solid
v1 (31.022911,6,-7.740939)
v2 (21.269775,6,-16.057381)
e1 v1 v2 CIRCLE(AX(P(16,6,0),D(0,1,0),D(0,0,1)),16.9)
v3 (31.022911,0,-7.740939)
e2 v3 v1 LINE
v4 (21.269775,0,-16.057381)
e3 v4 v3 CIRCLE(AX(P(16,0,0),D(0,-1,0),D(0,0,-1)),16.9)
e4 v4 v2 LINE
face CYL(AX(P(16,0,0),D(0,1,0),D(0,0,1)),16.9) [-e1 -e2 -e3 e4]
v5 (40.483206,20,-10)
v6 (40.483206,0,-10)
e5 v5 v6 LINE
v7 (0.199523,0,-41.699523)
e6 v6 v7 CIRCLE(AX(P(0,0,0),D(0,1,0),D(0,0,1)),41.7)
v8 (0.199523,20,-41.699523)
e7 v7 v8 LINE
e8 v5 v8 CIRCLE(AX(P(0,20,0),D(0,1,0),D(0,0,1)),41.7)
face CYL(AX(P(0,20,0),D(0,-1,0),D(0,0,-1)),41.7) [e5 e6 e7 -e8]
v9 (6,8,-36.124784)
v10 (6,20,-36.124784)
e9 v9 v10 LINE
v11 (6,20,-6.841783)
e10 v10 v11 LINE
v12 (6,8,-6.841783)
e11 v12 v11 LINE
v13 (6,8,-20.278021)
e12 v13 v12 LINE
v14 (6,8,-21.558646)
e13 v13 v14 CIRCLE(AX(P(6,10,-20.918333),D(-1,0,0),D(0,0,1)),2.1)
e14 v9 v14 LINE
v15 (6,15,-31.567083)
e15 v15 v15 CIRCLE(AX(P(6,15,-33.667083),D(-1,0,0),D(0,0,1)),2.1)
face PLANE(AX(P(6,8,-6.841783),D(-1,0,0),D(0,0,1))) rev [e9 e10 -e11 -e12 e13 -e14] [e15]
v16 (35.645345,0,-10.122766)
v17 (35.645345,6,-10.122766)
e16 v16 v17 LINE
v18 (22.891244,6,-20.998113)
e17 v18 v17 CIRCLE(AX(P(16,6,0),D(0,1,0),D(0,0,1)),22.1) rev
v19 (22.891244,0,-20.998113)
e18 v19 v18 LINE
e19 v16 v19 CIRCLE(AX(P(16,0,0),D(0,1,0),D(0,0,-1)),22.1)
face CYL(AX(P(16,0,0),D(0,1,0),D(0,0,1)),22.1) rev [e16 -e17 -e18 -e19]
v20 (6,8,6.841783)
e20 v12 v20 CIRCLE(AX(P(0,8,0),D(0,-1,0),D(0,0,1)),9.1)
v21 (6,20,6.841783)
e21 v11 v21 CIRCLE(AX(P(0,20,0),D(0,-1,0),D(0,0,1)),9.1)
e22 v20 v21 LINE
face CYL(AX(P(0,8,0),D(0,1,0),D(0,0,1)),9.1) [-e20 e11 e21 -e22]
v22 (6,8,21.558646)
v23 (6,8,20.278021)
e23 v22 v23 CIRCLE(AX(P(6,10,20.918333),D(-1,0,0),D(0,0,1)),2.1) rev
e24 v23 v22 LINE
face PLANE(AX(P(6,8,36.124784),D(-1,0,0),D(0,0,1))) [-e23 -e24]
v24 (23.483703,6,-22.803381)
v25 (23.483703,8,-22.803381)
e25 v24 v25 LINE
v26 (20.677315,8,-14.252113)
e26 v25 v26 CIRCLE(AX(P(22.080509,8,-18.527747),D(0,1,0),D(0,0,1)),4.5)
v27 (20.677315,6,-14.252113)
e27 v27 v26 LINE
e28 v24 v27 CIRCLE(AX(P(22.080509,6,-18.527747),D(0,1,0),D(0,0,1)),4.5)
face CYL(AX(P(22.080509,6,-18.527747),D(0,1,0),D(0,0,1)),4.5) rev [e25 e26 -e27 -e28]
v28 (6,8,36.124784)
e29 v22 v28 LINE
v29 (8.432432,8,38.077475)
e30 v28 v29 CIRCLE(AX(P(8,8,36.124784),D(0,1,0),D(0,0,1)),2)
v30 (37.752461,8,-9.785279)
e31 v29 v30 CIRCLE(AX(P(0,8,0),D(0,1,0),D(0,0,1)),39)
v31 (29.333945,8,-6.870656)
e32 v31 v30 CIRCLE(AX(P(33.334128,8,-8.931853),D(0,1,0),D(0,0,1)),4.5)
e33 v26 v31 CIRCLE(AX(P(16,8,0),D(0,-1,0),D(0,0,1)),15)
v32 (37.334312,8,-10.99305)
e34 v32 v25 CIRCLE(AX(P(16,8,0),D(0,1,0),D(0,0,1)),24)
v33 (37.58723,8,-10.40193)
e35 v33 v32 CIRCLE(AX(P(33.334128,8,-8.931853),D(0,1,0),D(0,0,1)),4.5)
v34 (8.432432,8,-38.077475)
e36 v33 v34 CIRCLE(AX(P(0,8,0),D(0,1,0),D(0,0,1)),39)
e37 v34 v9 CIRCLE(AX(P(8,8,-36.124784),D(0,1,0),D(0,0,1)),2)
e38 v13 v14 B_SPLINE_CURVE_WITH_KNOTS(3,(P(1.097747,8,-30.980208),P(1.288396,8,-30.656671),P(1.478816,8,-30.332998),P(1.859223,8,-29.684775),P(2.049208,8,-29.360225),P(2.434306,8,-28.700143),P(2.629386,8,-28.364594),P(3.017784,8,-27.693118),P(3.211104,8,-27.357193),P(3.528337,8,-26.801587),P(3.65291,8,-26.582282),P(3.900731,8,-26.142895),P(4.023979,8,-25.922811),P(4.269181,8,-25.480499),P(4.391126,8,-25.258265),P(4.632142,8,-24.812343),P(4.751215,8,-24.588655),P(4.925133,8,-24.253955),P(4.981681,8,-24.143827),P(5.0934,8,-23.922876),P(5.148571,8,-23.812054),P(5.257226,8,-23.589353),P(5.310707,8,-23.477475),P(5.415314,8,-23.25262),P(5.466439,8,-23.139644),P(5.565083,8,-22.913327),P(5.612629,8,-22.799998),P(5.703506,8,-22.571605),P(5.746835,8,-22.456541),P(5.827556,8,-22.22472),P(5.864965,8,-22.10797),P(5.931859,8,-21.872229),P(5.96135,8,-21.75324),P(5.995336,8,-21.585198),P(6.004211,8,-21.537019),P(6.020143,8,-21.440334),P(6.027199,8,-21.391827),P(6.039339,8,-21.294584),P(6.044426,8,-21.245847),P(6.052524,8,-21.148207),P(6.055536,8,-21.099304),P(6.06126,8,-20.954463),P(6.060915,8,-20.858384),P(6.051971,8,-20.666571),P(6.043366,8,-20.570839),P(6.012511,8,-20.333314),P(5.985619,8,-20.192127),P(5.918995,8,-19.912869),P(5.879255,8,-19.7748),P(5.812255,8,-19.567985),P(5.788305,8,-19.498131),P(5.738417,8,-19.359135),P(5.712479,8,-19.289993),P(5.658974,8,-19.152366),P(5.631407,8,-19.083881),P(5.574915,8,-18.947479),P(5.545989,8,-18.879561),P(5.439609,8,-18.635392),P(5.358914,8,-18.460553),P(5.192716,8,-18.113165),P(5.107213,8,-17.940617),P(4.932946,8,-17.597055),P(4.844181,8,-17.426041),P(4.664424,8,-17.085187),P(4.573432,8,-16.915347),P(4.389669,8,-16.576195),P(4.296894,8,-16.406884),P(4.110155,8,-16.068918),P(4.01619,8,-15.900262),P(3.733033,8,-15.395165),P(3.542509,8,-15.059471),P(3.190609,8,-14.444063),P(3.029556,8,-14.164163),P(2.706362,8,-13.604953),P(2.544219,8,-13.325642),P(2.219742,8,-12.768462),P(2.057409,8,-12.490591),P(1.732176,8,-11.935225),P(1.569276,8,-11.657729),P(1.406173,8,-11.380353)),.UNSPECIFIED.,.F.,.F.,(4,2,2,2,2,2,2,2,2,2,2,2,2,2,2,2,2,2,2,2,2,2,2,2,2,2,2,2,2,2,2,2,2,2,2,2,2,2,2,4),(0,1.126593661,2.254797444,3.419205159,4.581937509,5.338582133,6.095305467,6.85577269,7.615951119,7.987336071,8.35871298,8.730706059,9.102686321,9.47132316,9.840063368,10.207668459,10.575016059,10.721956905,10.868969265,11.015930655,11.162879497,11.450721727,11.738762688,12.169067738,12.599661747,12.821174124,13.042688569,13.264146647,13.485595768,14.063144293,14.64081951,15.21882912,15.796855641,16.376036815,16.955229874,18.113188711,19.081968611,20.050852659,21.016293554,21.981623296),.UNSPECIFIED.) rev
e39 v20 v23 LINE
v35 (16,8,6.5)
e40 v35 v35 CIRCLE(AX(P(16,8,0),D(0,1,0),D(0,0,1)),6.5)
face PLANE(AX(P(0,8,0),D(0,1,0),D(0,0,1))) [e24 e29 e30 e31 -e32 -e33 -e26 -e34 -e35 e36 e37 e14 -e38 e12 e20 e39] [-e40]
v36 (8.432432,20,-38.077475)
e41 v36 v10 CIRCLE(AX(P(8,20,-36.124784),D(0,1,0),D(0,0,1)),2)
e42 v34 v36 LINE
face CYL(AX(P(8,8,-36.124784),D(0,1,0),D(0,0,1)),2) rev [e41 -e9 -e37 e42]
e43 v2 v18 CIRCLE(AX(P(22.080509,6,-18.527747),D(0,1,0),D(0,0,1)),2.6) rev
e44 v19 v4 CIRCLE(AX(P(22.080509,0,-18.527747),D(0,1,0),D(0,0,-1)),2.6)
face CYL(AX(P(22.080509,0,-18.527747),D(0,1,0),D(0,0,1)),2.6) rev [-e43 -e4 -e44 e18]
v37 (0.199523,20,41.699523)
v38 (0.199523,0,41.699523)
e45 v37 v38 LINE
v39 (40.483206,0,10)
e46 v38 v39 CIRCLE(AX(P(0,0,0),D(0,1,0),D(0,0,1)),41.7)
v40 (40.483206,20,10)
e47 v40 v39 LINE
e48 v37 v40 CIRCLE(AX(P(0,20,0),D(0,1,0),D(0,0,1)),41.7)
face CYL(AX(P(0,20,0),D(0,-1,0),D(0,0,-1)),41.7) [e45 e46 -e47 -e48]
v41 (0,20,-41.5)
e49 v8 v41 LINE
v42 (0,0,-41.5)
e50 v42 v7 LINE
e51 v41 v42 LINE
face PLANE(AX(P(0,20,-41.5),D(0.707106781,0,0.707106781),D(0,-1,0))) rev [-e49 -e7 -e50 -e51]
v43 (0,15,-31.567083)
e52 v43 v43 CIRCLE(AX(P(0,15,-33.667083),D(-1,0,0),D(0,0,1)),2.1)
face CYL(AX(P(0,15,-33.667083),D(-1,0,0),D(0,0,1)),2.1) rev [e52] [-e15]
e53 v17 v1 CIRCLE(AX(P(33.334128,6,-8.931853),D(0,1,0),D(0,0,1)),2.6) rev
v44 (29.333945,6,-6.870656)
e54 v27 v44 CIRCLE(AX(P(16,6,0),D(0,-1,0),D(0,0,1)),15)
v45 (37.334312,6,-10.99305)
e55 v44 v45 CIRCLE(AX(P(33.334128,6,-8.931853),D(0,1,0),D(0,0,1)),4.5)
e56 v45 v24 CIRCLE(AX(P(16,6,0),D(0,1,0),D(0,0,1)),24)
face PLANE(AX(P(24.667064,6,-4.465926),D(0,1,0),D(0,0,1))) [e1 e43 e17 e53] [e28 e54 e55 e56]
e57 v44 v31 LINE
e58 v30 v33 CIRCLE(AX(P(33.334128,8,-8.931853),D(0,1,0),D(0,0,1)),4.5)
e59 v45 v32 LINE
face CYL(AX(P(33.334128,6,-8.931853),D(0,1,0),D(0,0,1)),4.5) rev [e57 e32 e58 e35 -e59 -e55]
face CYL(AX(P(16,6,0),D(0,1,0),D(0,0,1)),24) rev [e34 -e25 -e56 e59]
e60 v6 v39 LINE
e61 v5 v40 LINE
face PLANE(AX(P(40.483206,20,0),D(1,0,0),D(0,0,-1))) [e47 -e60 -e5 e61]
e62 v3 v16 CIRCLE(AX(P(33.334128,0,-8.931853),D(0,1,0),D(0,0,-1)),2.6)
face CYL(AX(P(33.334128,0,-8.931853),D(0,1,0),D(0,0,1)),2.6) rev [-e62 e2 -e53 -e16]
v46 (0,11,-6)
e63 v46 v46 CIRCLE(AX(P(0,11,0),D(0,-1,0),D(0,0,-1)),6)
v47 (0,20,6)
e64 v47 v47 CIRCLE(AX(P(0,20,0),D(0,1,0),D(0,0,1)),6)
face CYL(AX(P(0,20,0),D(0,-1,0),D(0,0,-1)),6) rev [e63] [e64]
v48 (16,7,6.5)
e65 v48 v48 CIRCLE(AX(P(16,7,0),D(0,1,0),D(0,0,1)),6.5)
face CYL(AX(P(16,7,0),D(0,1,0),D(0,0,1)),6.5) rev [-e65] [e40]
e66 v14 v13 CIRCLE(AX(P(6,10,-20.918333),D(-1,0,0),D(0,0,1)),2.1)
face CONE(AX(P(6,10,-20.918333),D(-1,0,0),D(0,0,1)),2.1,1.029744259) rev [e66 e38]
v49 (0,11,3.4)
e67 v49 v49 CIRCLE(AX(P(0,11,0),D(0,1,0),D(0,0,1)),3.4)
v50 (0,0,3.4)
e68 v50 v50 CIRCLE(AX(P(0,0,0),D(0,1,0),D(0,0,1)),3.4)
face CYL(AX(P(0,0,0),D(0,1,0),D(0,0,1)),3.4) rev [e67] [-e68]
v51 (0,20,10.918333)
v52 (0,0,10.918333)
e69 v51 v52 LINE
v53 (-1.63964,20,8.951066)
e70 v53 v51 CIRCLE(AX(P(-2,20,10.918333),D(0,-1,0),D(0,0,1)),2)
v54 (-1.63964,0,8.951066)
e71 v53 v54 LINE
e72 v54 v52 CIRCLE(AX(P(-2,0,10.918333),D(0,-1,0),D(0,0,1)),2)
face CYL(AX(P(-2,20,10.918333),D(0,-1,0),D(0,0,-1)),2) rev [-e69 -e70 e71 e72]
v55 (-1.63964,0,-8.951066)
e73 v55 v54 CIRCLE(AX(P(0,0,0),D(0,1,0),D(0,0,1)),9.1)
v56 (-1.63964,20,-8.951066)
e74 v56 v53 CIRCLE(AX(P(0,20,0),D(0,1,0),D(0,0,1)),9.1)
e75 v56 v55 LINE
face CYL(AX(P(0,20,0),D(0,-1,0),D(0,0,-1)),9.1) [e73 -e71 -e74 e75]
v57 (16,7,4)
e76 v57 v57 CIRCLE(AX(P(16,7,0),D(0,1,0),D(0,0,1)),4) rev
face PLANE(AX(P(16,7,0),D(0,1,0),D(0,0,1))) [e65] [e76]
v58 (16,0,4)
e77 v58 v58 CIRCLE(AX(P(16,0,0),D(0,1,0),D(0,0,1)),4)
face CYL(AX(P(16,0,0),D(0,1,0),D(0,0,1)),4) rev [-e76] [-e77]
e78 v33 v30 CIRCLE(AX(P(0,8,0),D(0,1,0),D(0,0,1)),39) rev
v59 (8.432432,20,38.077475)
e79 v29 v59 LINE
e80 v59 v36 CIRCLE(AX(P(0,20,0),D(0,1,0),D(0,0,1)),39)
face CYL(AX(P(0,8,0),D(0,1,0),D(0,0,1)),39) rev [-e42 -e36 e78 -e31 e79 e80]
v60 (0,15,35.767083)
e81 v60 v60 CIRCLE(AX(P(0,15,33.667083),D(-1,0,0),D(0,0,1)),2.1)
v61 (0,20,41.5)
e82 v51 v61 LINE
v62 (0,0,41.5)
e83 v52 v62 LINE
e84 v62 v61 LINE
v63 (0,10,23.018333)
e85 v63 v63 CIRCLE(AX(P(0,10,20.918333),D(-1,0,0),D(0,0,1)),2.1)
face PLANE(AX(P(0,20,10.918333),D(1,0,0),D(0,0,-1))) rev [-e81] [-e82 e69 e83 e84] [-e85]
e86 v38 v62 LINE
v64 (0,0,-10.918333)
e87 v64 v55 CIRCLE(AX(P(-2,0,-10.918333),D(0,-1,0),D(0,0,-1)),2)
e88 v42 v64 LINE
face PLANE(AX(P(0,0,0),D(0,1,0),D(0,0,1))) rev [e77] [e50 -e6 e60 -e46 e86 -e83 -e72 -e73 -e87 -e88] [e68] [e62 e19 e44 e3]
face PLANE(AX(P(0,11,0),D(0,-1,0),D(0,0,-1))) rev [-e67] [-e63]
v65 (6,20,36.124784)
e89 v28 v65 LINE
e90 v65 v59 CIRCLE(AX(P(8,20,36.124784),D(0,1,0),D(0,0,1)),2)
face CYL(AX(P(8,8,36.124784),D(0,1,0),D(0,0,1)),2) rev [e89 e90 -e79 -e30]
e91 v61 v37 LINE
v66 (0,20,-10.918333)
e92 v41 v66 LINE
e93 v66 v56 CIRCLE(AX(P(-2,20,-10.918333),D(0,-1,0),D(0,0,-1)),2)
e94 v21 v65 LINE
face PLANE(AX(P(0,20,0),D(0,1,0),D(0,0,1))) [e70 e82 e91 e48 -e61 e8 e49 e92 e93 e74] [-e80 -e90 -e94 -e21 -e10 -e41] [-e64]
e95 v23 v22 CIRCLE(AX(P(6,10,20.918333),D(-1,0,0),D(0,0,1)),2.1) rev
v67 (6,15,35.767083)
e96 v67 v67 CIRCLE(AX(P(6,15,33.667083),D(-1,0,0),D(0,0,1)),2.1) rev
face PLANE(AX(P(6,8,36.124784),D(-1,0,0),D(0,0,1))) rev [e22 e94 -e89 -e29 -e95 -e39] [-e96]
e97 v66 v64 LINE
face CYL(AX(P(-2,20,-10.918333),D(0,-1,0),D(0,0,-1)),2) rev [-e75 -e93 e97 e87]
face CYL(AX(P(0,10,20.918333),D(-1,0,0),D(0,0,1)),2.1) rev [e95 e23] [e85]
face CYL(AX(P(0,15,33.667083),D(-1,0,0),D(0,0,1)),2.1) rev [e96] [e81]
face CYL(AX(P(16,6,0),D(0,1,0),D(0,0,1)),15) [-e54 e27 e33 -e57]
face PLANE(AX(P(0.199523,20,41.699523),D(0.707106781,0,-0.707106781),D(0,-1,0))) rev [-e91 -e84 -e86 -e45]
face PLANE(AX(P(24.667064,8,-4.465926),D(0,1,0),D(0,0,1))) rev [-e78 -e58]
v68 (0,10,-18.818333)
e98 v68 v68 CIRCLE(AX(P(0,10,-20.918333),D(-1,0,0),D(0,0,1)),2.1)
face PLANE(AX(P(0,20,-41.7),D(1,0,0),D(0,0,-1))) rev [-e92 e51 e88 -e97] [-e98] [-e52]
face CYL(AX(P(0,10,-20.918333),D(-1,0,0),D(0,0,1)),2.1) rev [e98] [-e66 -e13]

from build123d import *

# Parameters (mm, degrees)
SKETCH_1_R               = 6
EXTRUDE_1_DEPTH          = 20
SKETCH_2_R               = 6.1
EXTRUDE_2_DEPTH          = 11
SKETCH_3_R               = 3.4
CUT_EXTRUDE_1_DEPTH      = 60.989832472
CUT_EXTRUDE_5_DEPTH      = 63.271823484
CUT_EXTRUDE_START        = -12
CUT_EXTRUDE_6_DEPTH      = 12
SKETCH_12_R              = 4
CUT_EXTRUDE_7_DEPTH      = 60.344586948
SKETCH_13_R              = 6.5
CUT_EXTRUDE_8_DEPTH      = 1
CUT_EXTRUDE_9_DEPTH      = 60.344586948
CUT_EXTRUDE_9_DEPTH_BACK = 60.344586948
CUT_EXTRUDE_10_DEPTH     = 2
CHAMFER_1_SIZE           = 0.2
M5X0_8_2_OUTLINE_R       = 2.1
M5X0_8_2_DEPTH           = 6
M5X0_8_2_2_OUTLINE_W     = 1.999932927
M5X0_8_2_2_OUTLINE_H     = 6.060126363


# Read off the part's stored shape, not the designer's step: M5x0.8 螺纹孔2
with BuildPart() as part:
    # 草图1 → 凸台-拉伸1 (new body)
    with BuildSketch(Plane(origin=(0, 0, 0), x_dir=(1, 0, 0), z_dir=(0, 1, 0))):
        with BuildLine():
            Line((0, 41.7), (0, 10.918333206))
            ThreePointArc((0, 10.918333206), (-0.463653568, 9.637849063), (-1.63963964, 8.951065962))
            ThreePointArc((-1.63963964, 8.951065962), (-9.1, 0), (-1.63963964, -8.951065962))
            ThreePointArc((-1.63963964, -8.951065962), (-0.463653568, -9.637849063), (0, -10.918333206))
            Line((0, -10.918333206), (0, -41.7))
            ThreePointArc((0, -41.7), (41.7, 0), (0, 41.7))
        make_face()
        with Locations(Location((0, 0, 0), (0, 0, 270))):
            Circle(SKETCH_1_R, mode=Mode.SUBTRACT)
    extrude(amount=EXTRUDE_1_DEPTH)

    # 草图2 → 凸台-拉伸2 (add)
    with BuildSketch(Plane.XZ):
        Circle(SKETCH_2_R)
    extrude(amount=-EXTRUDE_2_DEPTH)

    # 草图3 → 切除-拉伸1 (cut, through all)
    with BuildSketch(Plane(origin=(0, 11, 0), x_dir=(1, 0, 0), z_dir=(0, 1, 0))):
        with Locations(Location((0, 0, 0), (0, 0, 270))):
            Circle(SKETCH_3_R)
    extrude(amount=-CUT_EXTRUDE_1_DEPTH, mode=Mode.SUBTRACT)

    # 草图10 → 切除-拉伸5 (cut, through all)
    with BuildSketch(Plane.XZ):
        with BuildLine():
            Line((40.483206395, 10), (40.483206395, -10))
            ThreePointArc((40.483206395, -10), (41.394683878, -5.036878663), (41.7, 0))
            ThreePointArc((41.7, 0), (41.394683878, 5.036878663), (40.483206395, 10))
        make_face()
    extrude(amount=-CUT_EXTRUDE_5_DEPTH, mode=Mode.SUBTRACT)

    # 草图11 → 切除-拉伸6 (cut)
    with BuildSketch(Plane(origin=(0, 20, 0), x_dir=(1, 0, 0), z_dir=(0, 1, 0)).offset(CUT_EXTRUDE_START)):
        with BuildLine():
            Line((6, -36.124783736), (6, -6.841783393))
            ThreePointArc((6, -6.841783393), (9.1, 0), (6, 6.841783393))
            Line((6, 6.841783393), (6, 36.124783736))
            ThreePointArc((6, 36.124783736), (6.747974614, 37.684409471), (8.432432432, 38.077474749))
            ThreePointArc((8.432432432, 38.077474749), (39, 0), (8.432432432, -38.077474749))
            ThreePointArc((8.432432432, -38.077474749), (6.747974614, -37.684409471), (6, -36.124783736))
        make_face()
    extrude(amount=CUT_EXTRUDE_6_DEPTH, mode=Mode.SUBTRACT)

    # 草图12 → 切除-拉伸7 (cut, through all)
    with BuildSketch(Plane(origin=(0, 8, 0), x_dir=(1, 0, 0), z_dir=(0, 1, 0))):
        with Locations(Location((16, 0, 0), (0, 0, 270))):
            Circle(SKETCH_12_R)
    extrude(amount=-CUT_EXTRUDE_7_DEPTH, mode=Mode.SUBTRACT)

    # 草图13 → 切除-拉伸8 (cut)
    with BuildSketch(Plane(origin=(0, 8, 0), x_dir=(1, 0, 0), z_dir=(0, 1, 0))):
        with Locations(Location((16, 0, 0), (0, 0, 270))):
            Circle(SKETCH_13_R)
    extrude(amount=-CUT_EXTRUDE_8_DEPTH, mode=Mode.SUBTRACT)

    # 草图14 → 切除-拉伸9 (cut, two sides: drawn at the far end of the back side and taken through both)
    with BuildSketch(Plane(origin=(0, 8, 0), x_dir=(1, 0, 0), z_dir=(0, 1, 0)).offset(-CUT_EXTRUDE_9_DEPTH_BACK)):
        with BuildLine():
            ThreePointArc((22.891243611, 20.998113284), (30.339314214, 16.81648203), (35.645345475, 10.122766478))
            ThreePointArc((35.645345475, 10.122766478), (34.525042064, 6.62063566), (31.022911246, 7.740939071))
            ThreePointArc((31.022911246, 7.740939071), (26.965357928, 12.859662729), (21.269774526, 16.057380747))
            ThreePointArc((21.269774526, 16.057380747), (19.6101428, 19.338481558), (22.891243611, 20.998113284))
        make_face()
    extrude(amount=CUT_EXTRUDE_9_DEPTH + CUT_EXTRUDE_9_DEPTH_BACK, mode=Mode.SUBTRACT)

    # 草图15 → 切除-拉伸10 (cut)
    with BuildSketch(Plane(origin=(0, 8, 0), x_dir=(1, 0, 0), z_dir=(0, 1, 0))):
        with BuildLine():
            ThreePointArc((37.334311828, 10.993049569), (31.572105933, 18.262242929), (23.483703469, 22.803380942))
            ThreePointArc((23.483703469, 22.803380942), (17.804875142, 19.930941416), (20.677314668, 14.252113089))
            ThreePointArc((20.677314668, 14.252113089), (25.732566208, 11.413901831), (29.333944893, 6.87065598))
            ThreePointArc((29.333944893, 6.87065598), (35.395325154, 4.931669307), (37.334311828, 10.993049569))
        make_face()
    extrude(amount=-CUT_EXTRUDE_10_DEPTH, mode=Mode.SUBTRACT)

    # 倒角1
    chamfer_1_edges = [part.edges().sort_by_distance(p)[0] for p in [
        (0, 10, 41.7),
        (0, 10, -41.7),
    ]]
    chamfer(chamfer_1_edges, length=CHAMFER_1_SIZE)

    # M5x0.8 螺纹孔2 outline → M5x0.8 螺纹孔2 (cut)
    with BuildSketch(Plane.YZ):
        with Locations((15, -33.667083302)):
            Circle(M5X0_8_2_OUTLINE_R)
        with Locations((10, 20.918333206)):
            Circle(M5X0_8_2_OUTLINE_R)
        with Locations((15, 33.667083302)):
            Circle(M5X0_8_2_OUTLINE_R)
    extrude(amount=M5X0_8_2_DEPTH, mode=Mode.SUBTRACT)

    # M5x0.8 _2 2 outline → M5x0.8 _2 2 (revolve, cut)
    with BuildSketch(Plane(origin=(0, 10, -20.918333206), x_dir=(0, 1, 0), z_dir=(0, 0, -1))):
        with Locations((0.999966464, 3.030063182)):
            Rectangle(M5X0_8_2_2_OUTLINE_W, M5X0_8_2_2_OUTLINE_H)
        Polygon((2.100006439, 5.999996131), (1.999932927, 6.060126363), (1.999932927, 0), (2.100006439, 0), align=None)
    revolve(axis=Axis((0, 10, -20.918333206), (1, 0, 0)), mode=Mode.SUBTRACT)


solid = part.part
